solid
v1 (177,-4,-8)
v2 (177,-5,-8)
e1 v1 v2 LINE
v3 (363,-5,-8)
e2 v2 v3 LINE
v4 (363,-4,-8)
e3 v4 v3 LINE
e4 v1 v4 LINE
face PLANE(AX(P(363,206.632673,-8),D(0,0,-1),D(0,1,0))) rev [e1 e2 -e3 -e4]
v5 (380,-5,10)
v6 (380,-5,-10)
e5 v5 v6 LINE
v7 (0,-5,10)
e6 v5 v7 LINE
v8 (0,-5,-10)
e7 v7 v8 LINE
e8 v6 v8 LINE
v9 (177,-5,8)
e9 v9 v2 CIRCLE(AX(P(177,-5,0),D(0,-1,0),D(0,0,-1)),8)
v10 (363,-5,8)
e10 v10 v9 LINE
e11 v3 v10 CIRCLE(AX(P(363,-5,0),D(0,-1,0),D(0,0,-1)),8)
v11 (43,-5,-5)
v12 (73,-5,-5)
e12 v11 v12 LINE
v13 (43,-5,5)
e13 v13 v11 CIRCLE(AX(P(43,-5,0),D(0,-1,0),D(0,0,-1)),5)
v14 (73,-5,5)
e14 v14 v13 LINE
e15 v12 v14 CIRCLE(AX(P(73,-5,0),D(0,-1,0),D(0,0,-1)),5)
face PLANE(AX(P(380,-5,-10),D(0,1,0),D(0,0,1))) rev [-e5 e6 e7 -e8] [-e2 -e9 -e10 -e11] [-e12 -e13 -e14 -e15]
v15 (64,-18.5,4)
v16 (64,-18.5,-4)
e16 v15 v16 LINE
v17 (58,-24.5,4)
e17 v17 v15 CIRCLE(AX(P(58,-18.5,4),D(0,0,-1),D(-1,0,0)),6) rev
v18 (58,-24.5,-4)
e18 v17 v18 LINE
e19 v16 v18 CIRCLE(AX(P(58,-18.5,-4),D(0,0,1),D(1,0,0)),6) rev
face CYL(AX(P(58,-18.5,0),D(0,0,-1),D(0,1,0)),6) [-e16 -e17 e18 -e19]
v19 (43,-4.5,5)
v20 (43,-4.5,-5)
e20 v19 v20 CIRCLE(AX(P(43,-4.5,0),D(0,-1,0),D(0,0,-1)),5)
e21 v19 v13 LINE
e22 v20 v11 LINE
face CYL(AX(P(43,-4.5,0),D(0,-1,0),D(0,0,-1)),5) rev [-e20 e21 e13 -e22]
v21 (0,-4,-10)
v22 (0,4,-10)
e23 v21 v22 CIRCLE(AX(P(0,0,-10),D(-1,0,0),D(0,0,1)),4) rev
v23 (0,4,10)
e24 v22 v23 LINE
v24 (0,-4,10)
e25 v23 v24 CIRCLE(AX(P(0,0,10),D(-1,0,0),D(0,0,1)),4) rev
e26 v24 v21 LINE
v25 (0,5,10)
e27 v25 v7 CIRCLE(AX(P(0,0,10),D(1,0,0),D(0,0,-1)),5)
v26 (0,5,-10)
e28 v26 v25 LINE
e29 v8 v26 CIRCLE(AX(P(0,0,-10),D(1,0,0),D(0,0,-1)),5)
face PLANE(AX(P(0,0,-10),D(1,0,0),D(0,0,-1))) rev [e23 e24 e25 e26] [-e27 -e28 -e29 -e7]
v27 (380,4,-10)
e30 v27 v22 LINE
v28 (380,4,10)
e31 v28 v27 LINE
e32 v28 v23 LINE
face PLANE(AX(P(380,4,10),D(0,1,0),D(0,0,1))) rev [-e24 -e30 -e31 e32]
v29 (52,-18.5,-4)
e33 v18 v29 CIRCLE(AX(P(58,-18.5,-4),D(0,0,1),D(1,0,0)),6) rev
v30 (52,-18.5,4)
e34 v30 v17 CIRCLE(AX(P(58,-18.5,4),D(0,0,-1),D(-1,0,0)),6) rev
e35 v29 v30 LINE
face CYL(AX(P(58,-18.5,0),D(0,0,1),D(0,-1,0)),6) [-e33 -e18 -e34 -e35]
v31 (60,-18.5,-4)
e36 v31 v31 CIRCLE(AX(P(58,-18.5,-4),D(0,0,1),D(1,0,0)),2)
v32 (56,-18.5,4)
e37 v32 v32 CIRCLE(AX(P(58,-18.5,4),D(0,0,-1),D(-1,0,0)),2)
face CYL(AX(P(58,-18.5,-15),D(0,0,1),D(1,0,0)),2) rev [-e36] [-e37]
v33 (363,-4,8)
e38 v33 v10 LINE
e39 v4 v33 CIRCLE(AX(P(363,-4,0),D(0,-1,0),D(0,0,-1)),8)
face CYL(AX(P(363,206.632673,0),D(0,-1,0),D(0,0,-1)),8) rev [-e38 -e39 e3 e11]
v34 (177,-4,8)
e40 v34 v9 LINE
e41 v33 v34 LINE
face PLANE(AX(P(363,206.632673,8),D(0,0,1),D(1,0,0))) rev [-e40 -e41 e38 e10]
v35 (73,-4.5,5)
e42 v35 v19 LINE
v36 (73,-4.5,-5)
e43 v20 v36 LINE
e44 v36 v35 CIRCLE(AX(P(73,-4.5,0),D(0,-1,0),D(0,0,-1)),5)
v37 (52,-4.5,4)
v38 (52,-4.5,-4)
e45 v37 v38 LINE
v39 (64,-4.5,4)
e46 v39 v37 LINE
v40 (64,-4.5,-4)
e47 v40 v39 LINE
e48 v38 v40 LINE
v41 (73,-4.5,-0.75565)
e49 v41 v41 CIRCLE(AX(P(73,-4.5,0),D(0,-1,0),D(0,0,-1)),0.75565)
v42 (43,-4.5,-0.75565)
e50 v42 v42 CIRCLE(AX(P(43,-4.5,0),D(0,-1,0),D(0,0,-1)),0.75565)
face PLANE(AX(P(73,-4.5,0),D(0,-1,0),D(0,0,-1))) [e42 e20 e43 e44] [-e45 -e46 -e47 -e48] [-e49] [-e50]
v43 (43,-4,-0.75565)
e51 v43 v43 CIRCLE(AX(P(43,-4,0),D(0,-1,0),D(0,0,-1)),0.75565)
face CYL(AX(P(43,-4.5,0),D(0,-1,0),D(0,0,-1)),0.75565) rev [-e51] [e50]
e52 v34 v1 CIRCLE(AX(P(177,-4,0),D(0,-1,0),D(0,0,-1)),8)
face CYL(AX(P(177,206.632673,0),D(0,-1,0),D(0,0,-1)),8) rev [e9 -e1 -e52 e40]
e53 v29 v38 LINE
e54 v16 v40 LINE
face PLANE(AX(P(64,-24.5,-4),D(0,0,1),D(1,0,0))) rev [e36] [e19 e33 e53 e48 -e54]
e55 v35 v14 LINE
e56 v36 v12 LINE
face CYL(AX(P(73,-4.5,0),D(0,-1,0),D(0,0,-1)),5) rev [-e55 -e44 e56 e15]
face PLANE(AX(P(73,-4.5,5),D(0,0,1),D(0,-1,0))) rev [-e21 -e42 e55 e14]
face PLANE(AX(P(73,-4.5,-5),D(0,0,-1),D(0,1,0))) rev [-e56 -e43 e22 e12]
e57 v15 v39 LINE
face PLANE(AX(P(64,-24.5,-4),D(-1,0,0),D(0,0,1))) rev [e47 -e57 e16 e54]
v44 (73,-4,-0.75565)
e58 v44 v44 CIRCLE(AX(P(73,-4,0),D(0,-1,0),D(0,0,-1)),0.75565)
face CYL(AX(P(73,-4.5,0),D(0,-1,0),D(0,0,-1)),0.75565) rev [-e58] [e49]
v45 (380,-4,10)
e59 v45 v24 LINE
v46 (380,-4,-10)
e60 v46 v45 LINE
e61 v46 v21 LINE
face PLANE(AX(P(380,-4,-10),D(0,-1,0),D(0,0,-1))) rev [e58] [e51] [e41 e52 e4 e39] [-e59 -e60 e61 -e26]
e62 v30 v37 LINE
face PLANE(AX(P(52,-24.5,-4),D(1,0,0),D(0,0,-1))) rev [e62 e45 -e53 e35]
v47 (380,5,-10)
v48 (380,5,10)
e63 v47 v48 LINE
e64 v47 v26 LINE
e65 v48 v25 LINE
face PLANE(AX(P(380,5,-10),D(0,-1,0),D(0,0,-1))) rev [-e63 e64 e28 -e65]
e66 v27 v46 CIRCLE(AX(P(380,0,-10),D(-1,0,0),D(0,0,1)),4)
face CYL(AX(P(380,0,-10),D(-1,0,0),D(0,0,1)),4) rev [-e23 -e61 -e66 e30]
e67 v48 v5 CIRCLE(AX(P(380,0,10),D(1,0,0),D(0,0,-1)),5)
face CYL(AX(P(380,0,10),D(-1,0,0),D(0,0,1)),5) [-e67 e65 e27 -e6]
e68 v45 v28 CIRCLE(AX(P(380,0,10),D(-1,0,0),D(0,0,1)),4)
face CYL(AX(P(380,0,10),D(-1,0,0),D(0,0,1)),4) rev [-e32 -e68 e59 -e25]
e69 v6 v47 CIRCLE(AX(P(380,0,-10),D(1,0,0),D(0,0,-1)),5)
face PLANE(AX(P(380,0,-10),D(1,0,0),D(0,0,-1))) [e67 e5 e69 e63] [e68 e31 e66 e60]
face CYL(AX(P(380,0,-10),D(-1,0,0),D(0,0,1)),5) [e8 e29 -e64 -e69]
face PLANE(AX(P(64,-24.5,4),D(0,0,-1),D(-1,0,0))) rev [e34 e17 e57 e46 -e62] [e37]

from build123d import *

# Parameters (mm, degrees)
EXTRUDE_1_DEPTH          = 380
CUT_EXTRUDE_1_DEPTH      = 0.5
SKETCH_3_W               = 12
SKETCH_3_H               = 8
EXTRUDE_2_DEPTH          = 20
FILLET_1_R               = 6
CUT_EXTRUDE_2_DEPTH      = 382.084308257
CUT_EXTRUDE_2_DEPTH_BACK = 382.084308257
CUT_EXTRUDE_3_DEPTH      = 9
CUT_EXTRUDE_4_DEPTH      = 382.262704706
CUT_EXTRUDE_4_DEPTH_BACK = 382.262704706
SKETCH_6_R               = 2
HOLE_WIZARD_1_64_1_D     = 1.5113
HOLE_WIZARD_1_64_1_DEPTH = 5.69
HOLE_WIZARD_1_64_1_TIP   = 0.454040327


with BuildPart() as part:
    # 草图1 → 凸台-拉伸1 (new body)
    with BuildSketch(Plane(origin=(0, 0, 0), x_dir=(0, 0, -1), z_dir=(1, 0, 0))):
        with BuildLine():
            Line((10, -5), (-10, -5))
            ThreePointArc((-10, -5), (-15, 0), (-10, 5))
            Line((-10, 5), (10, 5))
            ThreePointArc((10, 5), (15, 0), (10, -5))
        make_face()
    extrude(amount=EXTRUDE_1_DEPTH)

    # 草图2 → 切除-拉伸1 (cut)
    with BuildSketch(Plane.XZ.offset(5)):
        with BuildLine():
            Line((73, -5), (43, -5))
            ThreePointArc((43, -5), (38, 0), (43, 5))
            Line((43, 5), (73, 5))
            ThreePointArc((73, 5), (78, 0), (73, -5))
        make_face()
    extrude(amount=-CUT_EXTRUDE_1_DEPTH, mode=Mode.SUBTRACT)

    # 草图3 → 凸台-拉伸2 (add)
    with BuildSketch(Plane.XZ.offset(4.5)):
        with Locations((58, 0)):
            Rectangle(SKETCH_3_W, SKETCH_3_H)
    extrude(amount=EXTRUDE_2_DEPTH)

    # 圆角1
    fillet_1_edges = [part.edges().sort_by_distance(p)[0] for p in [
        (64, -24.5, 0),
        (52, -24.5, 0),
    ]]
    fillet(fillet_1_edges, radius=FILLET_1_R - 0.0001)  # a hair under: the kernel refuses the full size

    # 草图4 → 切除-拉伸2 (cut, two sides: drawn at the far end of the back side and taken through both)
    with BuildSketch(Plane.ZY.offset(-CUT_EXTRUDE_2_DEPTH_BACK)):
        with BuildLine():
            Line((-10, -4), (10, -4))
            ThreePointArc((10, -4), (14, 0), (10, 4))
            Line((10, 4), (-10, 4))
            ThreePointArc((-10, 4), (-14, 0), (-10, -4))
        make_face()
    extrude(amount=CUT_EXTRUDE_2_DEPTH + CUT_EXTRUDE_2_DEPTH_BACK, mode=Mode.SUBTRACT)

    # 草图5 → 切除-拉伸3 (cut)
    with BuildSketch(Plane.XZ.offset(5)):
        with BuildLine():
            Line((363, -8), (177, -8))
            ThreePointArc((177, -8), (169, 0), (177, 8))
            Line((177, 8), (363, 8))
            ThreePointArc((363, 8), (371, 0), (363, -8))
        make_face()
    extrude(amount=-CUT_EXTRUDE_3_DEPTH, mode=Mode.SUBTRACT)

    # 草图6 → 切除-拉伸4 (cut, two sides: drawn at the far end of the back side and taken through both)
    with BuildSketch(Plane.XY.offset(4).offset(-CUT_EXTRUDE_4_DEPTH_BACK)):
        with Locations((58, -18.5)):
            Circle(SKETCH_6_R)
    extrude(amount=CUT_EXTRUDE_4_DEPTH + CUT_EXTRUDE_4_DEPTH_BACK, mode=Mode.SUBTRACT)

    # #1-64 螺纹孔1
    with Locations(Plane(origin=(0, -4.5, 0), x_dir=(-1, 0, 0), z_dir=(0, -1, 0))):
        with Locations((-43, 0), (-73, 0)):
            Hole(HOLE_WIZARD_1_64_1_D / 2, depth=HOLE_WIZARD_1_64_1_DEPTH)
            with Locations((0, 0, -(HOLE_WIZARD_1_64_1_DEPTH + HOLE_WIZARD_1_64_1_TIP / 2))):  # 118° drill point
                Cone(0, HOLE_WIZARD_1_64_1_D / 2, HOLE_WIZARD_1_64_1_TIP, mode=Mode.SUBTRACT)


solid = part.part
